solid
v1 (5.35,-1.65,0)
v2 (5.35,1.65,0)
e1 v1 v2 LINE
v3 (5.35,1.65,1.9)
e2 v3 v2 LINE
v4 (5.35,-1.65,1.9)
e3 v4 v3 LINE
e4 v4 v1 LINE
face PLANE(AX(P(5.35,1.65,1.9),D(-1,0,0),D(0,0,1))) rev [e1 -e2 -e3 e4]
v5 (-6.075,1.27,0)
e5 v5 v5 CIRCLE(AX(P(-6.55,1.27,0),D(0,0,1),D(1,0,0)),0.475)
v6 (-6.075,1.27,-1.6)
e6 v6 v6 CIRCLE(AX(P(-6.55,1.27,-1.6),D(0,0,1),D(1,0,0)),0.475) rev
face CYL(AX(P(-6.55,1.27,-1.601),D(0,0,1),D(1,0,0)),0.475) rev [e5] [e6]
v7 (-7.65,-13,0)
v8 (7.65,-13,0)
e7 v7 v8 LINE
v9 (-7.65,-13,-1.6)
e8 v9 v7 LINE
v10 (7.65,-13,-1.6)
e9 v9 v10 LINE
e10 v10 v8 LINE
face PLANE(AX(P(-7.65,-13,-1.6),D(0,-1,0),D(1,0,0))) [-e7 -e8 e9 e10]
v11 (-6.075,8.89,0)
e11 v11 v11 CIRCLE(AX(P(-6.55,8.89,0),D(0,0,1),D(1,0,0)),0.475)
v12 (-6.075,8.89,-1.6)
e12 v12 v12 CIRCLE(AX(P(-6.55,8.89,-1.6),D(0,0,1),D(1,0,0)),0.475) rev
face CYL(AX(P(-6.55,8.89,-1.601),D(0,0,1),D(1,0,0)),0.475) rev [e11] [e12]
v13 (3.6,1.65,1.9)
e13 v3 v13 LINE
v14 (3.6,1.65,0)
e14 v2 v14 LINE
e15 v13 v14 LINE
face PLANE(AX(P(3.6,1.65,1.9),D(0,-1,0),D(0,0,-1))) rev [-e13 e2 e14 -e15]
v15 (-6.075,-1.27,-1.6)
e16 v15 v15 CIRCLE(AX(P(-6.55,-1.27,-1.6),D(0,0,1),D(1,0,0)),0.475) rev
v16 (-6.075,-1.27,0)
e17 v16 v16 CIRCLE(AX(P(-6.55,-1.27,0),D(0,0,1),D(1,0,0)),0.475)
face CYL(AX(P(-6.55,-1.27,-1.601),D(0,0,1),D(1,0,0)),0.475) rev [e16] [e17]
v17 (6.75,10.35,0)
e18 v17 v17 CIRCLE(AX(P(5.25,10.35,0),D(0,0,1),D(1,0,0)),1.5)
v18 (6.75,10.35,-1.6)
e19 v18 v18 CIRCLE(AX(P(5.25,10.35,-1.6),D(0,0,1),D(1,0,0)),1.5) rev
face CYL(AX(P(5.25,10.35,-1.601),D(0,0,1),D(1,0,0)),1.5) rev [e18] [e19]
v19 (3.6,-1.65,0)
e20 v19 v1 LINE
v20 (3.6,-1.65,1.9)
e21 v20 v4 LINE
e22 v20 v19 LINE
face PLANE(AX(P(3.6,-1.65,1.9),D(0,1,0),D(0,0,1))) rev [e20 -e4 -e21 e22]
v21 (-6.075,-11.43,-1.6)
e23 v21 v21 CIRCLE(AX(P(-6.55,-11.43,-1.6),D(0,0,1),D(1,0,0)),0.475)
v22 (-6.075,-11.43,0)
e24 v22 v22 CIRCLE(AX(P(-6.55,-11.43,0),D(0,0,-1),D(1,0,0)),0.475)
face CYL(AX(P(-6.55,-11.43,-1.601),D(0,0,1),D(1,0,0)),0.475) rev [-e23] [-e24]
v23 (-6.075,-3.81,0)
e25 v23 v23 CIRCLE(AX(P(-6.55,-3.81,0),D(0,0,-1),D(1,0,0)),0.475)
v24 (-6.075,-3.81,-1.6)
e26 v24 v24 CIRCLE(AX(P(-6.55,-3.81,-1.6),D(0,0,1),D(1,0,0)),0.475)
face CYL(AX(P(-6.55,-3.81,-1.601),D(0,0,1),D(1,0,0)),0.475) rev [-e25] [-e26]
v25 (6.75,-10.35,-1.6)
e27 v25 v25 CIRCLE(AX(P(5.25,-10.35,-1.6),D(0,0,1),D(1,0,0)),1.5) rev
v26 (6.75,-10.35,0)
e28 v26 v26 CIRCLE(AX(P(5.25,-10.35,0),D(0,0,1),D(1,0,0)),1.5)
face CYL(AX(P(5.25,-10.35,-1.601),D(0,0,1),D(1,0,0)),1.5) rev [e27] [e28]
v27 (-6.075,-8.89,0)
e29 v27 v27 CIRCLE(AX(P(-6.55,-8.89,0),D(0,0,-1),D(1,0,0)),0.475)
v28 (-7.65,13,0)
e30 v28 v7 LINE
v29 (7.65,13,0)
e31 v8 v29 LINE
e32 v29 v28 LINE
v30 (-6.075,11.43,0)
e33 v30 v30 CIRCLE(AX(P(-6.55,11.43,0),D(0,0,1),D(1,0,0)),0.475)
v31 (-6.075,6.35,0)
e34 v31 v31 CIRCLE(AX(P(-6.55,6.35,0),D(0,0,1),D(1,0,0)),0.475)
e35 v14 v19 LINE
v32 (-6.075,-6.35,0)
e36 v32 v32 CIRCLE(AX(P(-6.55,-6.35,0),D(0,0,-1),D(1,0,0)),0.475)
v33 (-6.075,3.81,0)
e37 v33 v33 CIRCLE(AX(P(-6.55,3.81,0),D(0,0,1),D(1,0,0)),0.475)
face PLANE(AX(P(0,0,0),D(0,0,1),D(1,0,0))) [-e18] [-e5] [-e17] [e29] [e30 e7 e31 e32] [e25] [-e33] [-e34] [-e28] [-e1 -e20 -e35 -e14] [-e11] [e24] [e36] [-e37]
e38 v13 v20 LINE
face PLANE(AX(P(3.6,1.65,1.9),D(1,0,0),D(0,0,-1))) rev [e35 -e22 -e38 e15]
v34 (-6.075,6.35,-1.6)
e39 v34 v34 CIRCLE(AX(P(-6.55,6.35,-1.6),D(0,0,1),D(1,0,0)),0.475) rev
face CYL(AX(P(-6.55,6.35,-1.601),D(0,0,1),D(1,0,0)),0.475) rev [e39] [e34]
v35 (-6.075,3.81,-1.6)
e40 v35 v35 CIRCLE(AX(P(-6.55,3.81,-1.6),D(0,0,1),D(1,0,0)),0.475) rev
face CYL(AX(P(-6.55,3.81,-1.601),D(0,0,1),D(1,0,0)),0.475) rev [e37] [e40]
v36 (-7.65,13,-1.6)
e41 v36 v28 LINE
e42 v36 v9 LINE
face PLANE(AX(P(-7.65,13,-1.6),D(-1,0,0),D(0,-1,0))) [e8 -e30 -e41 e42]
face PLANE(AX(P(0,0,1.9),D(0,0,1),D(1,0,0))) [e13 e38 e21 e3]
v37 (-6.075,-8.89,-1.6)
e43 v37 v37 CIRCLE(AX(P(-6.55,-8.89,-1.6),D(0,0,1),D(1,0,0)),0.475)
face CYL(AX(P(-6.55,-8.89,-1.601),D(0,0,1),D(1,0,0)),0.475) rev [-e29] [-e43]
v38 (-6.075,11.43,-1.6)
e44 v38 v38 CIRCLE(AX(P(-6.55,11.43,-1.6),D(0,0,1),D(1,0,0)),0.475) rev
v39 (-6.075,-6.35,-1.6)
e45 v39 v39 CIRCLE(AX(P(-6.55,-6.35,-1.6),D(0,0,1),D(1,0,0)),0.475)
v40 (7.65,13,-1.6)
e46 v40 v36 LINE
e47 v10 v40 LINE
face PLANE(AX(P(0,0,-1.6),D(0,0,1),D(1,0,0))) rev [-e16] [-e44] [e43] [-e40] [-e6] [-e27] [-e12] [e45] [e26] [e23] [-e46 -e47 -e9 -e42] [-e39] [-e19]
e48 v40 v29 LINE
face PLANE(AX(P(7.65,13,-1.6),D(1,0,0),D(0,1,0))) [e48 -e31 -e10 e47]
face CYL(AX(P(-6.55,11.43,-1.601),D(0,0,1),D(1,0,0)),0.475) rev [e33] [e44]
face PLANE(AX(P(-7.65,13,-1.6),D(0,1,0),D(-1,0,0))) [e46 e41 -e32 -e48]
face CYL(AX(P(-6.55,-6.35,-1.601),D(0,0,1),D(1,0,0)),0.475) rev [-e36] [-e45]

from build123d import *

# Parameters (mm, degrees)
SKETCH_1_W             = 15.3
SKETCH_1_H             = 26
EXTRUDE_1_DEPTH        = 1.6
CUT_EXTRUDE_1_REACH    = 17.168
SKETCH_2_R             = 1.5
SKETCH_3_W             = 1.75
SKETCH_3_H             = 3.3
EXTRUDE_2_DEPTH        = 1.9
CUT_EXTRUDE_2_REACH    = 17.203
SKETCH_4_R             = 0.475
PATTERN_LINEAR_1_COUNT = 5
PATTERN_LINEAR_1_PITCH = 2.54
MIRROR_START           = -1.6
MIRROR_1_OUTLINE_R     = 0.475
MIRROR_1_DEPTH         = 1.6


# Read off the part's stored shape, not the designer's step: 镜向1
with BuildPart() as part:
    # 草图1 → 凸台-拉伸1 (new body)
    with BuildSketch(Plane.XY):
        Rectangle(SKETCH_1_W, SKETCH_1_H)
    extrude(amount=-EXTRUDE_1_DEPTH)

    # 草图2 → 切除-拉伸1 (cut, up to next)
    with BuildSketch(Plane.XY, mode=Mode.PRIVATE) as cut_extrude_1_sk1:
        with Locations((5.25, -10.35)):
            Circle(SKETCH_2_R)
    cut_extrude_1_tool1 = extrude(cut_extrude_1_sk1.sketch, amount=-CUT_EXTRUDE_1_REACH, mode=Mode.PRIVATE) & part.part
    # 草图2 → 切除-拉伸1 (cut, up to next)
    with BuildSketch(Plane.XY, mode=Mode.PRIVATE) as cut_extrude_1_sk2:
        with Locations((5.25, 10.35)):
            Circle(SKETCH_2_R)
    cut_extrude_1_tool2 = extrude(cut_extrude_1_sk2.sketch, amount=-CUT_EXTRUDE_1_REACH, mode=Mode.PRIVATE) & part.part
    add(cut_extrude_1_tool1.solids().sort_by_distance((5.25, -10.35, 0))[0], mode=Mode.SUBTRACT)
    add(cut_extrude_1_tool2.solids().sort_by_distance((5.25, 10.35, 0))[0], mode=Mode.SUBTRACT)

    # 草图3 → 凸台-拉伸2 (add)
    with BuildSketch(Plane.XY):
        with Locations((4.475, 0)):
            Rectangle(SKETCH_3_W, SKETCH_3_H)
    extrude(amount=EXTRUDE_2_DEPTH)

    # 草图4 → 切除-拉伸2 (cut, up to next)
    with BuildSketch(Plane.XY, mode=Mode.PRIVATE) as cut_extrude_2_sk1:
        with Locations((-6.55, 1.27)):
            Circle(SKETCH_4_R)
    cut_extrude_2_tool1 = extrude(cut_extrude_2_sk1.sketch, amount=-CUT_EXTRUDE_2_REACH, mode=Mode.PRIVATE) & part.part
    # 草图4 → 切除-拉伸2 (cut, up to next)
    with BuildSketch(Plane.XY, mode=Mode.PRIVATE) as cut_extrude_2_sk2:
        with Locations((-6.55, -1.27)):
            Circle(SKETCH_4_R)
    cut_extrude_2_tool2 = extrude(cut_extrude_2_sk2.sketch, amount=-CUT_EXTRUDE_2_REACH, mode=Mode.PRIVATE) & part.part
    cut_extrude_2_1 = cut_extrude_2_tool1.solids().sort_by_distance((-6.55, 1.27, 0))[0]
    add(cut_extrude_2_1, mode=Mode.SUBTRACT)
    cut_extrude_2_2 = cut_extrude_2_tool2.solids().sort_by_distance((-6.55, -1.27, 0))[0]
    add(cut_extrude_2_2, mode=Mode.SUBTRACT)
    cut_extrude_2 = cut_extrude_2_1 + cut_extrude_2_2  # 切除-拉伸2 as one shape, for the pattern or mirror that repeats it

    # 阵列(线性)1: 切除-拉伸2 ×5
    with Locations(*[(0, i * PATTERN_LINEAR_1_PITCH, 0) for i in range(1, PATTERN_LINEAR_1_COUNT)]):
        add(cut_extrude_2, mode=Mode.SUBTRACT)

    # 镜向1 outline → 镜向1 (cut)
    with BuildSketch(Plane.XY.offset(MIRROR_START)):
        with Locations((-6.55, -6.35)):
            Circle(MIRROR_1_OUTLINE_R)
        with Locations((-6.55, -3.81)):
            Circle(MIRROR_1_OUTLINE_R)
        with Locations((-6.55, -11.43)):
            Circle(MIRROR_1_OUTLINE_R)
        with Locations((-6.55, -8.89)):
            Circle(MIRROR_1_OUTLINE_R)
    extrude(amount=MIRROR_1_DEPTH, mode=Mode.SUBTRACT)


solid = part.part
